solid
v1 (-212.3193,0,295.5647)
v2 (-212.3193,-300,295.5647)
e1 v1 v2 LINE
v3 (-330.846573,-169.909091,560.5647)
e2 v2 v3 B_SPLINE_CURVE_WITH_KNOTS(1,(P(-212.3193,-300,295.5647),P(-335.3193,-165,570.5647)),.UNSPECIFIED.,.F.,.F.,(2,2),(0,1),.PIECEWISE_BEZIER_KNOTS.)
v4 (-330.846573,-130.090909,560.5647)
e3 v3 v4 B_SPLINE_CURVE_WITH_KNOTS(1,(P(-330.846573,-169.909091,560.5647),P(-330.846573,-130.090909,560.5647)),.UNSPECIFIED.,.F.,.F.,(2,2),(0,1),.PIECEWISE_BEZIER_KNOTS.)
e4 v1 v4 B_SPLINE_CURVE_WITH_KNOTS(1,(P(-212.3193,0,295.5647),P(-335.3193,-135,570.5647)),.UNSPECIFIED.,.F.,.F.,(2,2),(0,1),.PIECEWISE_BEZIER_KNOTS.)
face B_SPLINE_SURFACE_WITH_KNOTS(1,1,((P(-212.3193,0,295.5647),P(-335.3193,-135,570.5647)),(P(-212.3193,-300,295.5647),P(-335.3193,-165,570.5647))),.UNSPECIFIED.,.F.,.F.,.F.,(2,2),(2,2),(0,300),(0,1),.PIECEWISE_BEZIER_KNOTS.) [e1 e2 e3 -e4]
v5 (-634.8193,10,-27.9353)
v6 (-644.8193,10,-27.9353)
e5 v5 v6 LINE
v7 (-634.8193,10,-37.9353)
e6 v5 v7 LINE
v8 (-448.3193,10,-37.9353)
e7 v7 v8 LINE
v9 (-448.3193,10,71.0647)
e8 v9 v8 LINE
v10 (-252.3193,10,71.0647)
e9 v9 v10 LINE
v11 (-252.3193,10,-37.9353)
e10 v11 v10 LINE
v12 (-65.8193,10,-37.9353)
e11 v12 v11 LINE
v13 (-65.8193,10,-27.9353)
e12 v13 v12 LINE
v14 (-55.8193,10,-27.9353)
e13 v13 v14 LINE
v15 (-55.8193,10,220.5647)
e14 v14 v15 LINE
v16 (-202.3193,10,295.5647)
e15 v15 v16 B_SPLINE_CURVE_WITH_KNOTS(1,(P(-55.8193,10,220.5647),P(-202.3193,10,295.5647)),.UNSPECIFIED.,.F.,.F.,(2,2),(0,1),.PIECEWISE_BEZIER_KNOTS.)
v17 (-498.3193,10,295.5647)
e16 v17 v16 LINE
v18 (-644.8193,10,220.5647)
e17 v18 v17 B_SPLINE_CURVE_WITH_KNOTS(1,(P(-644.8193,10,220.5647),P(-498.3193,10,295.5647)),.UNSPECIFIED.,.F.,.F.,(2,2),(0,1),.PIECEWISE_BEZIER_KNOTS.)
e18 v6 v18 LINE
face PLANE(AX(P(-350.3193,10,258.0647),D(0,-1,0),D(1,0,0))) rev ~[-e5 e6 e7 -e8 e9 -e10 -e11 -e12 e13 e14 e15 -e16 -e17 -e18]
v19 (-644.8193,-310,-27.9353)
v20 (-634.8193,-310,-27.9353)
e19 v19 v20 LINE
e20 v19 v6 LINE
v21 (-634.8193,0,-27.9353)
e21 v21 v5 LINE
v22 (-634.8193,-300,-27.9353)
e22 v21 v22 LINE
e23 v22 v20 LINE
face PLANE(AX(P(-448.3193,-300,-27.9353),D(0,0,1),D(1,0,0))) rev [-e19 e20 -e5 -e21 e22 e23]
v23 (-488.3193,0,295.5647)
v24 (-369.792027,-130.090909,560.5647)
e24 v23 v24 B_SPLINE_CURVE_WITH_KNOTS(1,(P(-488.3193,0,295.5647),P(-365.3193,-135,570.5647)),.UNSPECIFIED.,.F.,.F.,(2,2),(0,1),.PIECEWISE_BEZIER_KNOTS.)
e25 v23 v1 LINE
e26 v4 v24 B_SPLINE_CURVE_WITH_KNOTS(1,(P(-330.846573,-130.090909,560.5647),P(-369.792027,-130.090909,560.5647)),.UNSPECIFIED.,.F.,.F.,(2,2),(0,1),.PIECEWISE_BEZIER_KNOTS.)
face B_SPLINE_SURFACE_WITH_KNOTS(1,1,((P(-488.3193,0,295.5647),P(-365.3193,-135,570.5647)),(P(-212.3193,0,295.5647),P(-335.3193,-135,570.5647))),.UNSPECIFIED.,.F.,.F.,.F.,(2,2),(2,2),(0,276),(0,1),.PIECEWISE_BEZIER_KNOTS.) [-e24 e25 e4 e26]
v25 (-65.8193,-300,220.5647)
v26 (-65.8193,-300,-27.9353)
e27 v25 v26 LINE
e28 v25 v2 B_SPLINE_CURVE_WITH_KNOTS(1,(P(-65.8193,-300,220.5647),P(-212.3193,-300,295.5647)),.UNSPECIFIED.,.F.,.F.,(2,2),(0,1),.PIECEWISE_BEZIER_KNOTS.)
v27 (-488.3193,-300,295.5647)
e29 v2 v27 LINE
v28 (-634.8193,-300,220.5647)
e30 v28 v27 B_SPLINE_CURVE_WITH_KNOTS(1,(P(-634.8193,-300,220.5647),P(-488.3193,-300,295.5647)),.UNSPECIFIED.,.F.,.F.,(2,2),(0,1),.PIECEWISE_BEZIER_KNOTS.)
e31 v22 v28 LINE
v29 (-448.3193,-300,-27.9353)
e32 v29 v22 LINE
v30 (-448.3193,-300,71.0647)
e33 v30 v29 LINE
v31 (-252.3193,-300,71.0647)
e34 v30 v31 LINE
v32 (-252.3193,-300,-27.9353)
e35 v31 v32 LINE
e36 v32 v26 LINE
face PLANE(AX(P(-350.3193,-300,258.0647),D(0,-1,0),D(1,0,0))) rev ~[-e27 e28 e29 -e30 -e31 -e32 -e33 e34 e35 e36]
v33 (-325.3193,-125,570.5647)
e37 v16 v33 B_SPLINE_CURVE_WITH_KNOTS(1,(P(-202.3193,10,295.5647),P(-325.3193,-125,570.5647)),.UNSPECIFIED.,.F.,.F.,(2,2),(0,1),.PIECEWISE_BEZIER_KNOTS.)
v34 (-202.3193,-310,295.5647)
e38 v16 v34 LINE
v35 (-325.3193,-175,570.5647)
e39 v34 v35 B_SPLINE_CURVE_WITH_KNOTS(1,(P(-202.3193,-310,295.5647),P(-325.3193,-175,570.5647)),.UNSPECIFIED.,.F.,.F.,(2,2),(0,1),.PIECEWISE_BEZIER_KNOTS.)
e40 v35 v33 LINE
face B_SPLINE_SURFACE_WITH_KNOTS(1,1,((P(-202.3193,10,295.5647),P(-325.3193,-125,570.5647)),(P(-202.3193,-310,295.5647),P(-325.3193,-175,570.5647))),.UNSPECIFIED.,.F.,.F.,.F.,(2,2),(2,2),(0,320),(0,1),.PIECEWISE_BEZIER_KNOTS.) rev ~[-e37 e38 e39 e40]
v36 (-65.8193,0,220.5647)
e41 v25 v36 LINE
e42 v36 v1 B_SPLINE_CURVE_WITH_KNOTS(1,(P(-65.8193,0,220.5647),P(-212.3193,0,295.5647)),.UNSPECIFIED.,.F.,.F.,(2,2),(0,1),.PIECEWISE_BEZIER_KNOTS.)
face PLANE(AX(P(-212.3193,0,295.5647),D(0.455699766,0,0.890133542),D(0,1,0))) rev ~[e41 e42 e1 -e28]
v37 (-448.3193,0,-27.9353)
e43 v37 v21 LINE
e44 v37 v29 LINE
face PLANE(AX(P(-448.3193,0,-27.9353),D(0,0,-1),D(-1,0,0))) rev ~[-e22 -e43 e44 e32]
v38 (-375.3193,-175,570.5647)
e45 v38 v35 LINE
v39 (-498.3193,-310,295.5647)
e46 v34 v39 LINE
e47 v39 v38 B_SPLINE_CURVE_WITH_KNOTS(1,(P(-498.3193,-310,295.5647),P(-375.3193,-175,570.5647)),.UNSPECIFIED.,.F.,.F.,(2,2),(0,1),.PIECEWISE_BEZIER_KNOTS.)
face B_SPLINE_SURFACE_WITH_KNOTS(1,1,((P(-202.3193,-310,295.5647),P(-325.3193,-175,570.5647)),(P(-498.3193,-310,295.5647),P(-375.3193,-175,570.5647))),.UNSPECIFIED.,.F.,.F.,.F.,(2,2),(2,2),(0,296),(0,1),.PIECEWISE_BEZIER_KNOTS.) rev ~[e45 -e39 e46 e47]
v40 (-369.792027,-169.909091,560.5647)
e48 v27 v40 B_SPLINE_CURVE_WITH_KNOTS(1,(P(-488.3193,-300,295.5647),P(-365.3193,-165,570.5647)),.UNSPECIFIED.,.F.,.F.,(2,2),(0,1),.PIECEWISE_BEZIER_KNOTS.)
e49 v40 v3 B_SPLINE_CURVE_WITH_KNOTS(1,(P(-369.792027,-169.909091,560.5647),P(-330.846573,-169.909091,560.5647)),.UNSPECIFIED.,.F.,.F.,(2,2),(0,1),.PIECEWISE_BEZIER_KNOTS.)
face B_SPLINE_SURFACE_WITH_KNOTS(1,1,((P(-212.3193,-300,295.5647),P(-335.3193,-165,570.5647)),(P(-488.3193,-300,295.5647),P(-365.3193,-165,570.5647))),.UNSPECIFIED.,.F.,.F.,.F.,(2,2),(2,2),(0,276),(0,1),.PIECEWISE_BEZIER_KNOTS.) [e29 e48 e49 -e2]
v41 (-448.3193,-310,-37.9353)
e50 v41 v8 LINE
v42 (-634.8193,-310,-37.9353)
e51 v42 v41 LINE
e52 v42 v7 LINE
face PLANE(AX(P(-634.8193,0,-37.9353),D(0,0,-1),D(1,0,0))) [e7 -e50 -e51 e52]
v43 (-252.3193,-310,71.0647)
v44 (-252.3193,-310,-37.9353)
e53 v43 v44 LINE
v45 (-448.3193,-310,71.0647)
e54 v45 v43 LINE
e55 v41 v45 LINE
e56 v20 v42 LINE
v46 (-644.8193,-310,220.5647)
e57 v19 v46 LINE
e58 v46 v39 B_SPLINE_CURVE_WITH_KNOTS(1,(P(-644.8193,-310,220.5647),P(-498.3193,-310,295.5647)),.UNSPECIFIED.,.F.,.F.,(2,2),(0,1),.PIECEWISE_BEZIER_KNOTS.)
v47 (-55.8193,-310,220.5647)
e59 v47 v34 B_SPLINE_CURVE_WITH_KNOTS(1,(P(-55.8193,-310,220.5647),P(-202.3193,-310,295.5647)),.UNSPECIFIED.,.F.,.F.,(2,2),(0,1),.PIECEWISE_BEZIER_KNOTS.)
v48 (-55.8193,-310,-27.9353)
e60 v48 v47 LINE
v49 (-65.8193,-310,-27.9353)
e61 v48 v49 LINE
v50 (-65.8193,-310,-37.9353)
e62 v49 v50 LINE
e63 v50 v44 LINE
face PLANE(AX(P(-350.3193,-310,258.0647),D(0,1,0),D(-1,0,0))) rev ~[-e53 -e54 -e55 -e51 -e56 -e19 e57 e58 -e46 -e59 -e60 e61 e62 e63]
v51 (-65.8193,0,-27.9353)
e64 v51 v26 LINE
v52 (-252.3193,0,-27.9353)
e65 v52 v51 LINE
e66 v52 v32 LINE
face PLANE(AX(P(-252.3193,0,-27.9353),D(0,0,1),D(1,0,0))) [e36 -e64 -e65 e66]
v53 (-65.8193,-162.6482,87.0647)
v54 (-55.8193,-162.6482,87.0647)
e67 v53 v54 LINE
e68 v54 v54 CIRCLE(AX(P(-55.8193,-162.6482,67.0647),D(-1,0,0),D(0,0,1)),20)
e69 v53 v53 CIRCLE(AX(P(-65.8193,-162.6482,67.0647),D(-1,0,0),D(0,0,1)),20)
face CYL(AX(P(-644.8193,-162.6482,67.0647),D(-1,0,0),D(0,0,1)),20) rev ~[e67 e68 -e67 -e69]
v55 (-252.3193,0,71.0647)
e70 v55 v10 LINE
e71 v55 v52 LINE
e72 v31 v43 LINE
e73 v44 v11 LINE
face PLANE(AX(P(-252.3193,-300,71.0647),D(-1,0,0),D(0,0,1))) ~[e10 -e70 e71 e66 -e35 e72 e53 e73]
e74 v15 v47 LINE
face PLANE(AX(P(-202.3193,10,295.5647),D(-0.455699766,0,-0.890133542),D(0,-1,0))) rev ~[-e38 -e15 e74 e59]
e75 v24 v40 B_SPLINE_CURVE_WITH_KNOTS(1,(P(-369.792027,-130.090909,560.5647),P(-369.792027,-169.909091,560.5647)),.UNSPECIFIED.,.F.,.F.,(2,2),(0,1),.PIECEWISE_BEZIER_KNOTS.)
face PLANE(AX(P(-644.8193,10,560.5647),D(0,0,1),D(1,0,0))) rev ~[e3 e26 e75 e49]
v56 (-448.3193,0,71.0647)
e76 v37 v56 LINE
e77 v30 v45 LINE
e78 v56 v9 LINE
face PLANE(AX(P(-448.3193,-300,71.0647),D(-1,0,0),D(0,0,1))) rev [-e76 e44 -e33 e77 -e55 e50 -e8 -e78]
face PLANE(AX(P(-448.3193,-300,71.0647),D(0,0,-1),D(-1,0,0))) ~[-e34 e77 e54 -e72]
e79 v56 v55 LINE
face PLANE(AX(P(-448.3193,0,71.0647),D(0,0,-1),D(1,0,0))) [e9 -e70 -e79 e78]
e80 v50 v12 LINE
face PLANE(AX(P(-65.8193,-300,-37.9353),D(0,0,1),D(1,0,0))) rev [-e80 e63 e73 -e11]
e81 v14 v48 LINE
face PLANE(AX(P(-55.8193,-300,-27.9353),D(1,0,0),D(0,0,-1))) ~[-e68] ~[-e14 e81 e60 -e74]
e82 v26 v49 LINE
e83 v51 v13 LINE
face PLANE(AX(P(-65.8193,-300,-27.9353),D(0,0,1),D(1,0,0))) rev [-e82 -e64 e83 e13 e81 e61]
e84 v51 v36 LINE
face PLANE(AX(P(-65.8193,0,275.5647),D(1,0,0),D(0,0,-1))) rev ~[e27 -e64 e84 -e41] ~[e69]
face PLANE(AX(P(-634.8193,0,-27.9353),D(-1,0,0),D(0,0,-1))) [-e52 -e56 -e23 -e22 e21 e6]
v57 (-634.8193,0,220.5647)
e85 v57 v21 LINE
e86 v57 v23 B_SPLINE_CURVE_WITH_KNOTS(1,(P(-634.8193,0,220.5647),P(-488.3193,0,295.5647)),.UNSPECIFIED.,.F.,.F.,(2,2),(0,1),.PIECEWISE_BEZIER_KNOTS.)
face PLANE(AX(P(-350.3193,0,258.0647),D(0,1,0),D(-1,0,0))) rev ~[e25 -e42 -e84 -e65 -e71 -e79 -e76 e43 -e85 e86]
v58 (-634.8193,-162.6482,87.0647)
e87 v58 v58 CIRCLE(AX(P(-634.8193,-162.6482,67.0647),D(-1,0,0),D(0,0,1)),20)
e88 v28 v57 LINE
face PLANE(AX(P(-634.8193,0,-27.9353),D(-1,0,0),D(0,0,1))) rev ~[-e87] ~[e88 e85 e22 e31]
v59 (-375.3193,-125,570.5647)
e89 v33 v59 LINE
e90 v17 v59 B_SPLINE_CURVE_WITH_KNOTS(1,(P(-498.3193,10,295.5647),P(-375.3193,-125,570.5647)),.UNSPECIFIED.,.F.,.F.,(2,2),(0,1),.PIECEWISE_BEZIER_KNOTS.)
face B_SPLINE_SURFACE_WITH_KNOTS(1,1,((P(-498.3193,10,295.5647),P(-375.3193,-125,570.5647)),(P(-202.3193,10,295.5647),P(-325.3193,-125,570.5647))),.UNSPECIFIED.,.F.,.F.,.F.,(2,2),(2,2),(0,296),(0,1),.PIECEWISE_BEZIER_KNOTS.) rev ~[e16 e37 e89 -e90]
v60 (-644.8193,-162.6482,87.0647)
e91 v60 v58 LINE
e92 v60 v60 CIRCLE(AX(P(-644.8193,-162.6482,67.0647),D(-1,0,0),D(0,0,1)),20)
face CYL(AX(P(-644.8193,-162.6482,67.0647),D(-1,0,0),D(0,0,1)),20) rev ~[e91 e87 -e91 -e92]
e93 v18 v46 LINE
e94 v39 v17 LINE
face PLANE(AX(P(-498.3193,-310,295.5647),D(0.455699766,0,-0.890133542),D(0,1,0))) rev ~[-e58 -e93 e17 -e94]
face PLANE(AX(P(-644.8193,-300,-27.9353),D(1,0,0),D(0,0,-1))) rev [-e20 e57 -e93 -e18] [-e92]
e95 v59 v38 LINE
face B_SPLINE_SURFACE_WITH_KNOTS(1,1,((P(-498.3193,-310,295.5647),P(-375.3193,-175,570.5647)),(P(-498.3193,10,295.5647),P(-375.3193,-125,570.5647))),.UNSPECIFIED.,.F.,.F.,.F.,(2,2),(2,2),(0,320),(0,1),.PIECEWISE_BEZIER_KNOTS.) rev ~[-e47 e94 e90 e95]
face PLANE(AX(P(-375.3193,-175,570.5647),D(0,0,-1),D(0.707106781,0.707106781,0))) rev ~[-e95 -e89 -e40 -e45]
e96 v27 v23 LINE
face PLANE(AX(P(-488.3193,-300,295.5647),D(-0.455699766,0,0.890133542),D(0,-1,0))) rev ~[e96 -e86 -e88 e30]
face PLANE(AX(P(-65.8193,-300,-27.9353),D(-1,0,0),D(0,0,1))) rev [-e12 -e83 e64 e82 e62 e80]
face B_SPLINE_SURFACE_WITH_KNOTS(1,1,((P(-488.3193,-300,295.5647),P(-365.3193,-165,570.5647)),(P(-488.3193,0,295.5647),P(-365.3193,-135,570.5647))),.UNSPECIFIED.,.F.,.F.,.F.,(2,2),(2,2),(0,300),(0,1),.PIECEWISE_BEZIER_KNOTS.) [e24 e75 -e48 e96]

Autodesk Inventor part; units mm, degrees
sketch "Sketch1" plane through (0, 0, 0) normal (0, 1, 0) x (-1, 0, 0)
  line L0 (65.8193, -27.9353) -> (65.8193, 275.5647)
  line L1 (65.8193, 275.5647) -> (634.8193, 275.5647)
  line L2 (634.8193, 275.5647) -> (634.8193, -27.9353)
  line L3 (448.3193, 71.0647) -> (252.3193, 71.0647)
  line L4 (448.3193, 71.0647) -> (448.3193, -27.9353)
  line L5 (252.3193, 71.0647) -> (252.3193, -27.9353)
  line L6 (65.8193, -27.9353) -> (252.3193, -27.9353)
  line L7 (448.3193, -27.9353) -> (634.8193, -27.9353)
  point P0 (0, 0)
  dimension "d0" = 569
  dimension "d1" = 303.5
  dimension "d2" = 196
  dimension "d3" = 186.5
  dimension "d4" = 99
extrude "Extrusion1" add sketch "Sketch1" along normal blind 10
sketch "Sketch2" plane through (0, 0, 0) normal (0, -1, 0) x (1, 0, 0)
  line L0 (-65.8193, 275.5647) -> (-65.8193, -27.9353) projected
  line L1 (-65.8193, 275.5647) -> (-65.8193, -27.9353)
  line L2 (-65.8193, -27.9353) -> (-55.8193, -27.9353)
  line L3 (-55.8193, -27.9353) -> (-55.8193, 275.5647)
  line L4 (-55.8193, 275.5647) -> (-65.8193, 275.5647)
  line L5 (-634.8193, 275.5647) -> (-65.8193, 275.5647) projected
  line L6 (-634.8193, -27.9353) -> (-634.8193, 275.5647) projected
  line L7 (-634.8193, 275.5647) -> (-634.8193, -27.9353)
  line L8 (-634.8193, -27.9353) -> (-644.8193, -27.9353)
  line L9 (-644.8193, -27.9353) -> (-644.8193, 275.5647)
  line L10 (-644.8193, 275.5647) -> (-634.8193, 275.5647)
  point P0 (0, 0)
  dimension "d7" = 10
  dimension "d8" = 10
extrude "Extrusion2" add sketch "Sketch2" along normal blind 300
extrude "Extrusion3" add sketch "Sketch2" against normal blind 10
sketch "Sketch3" plane through (0, 0, 0) normal (0, -1, 0) x (1, 0, 0)
  line L0 (-252.3193, -27.9353) -> (-65.8193, -27.9353) projected
  line L1 (-252.3193, -27.9353) -> (-65.8193, -27.9353)
  line L2 (-65.8193, -27.9353) -> (-65.8193, -37.9353)
  line L3 (-65.8193, -37.9353) -> (-252.3193, -37.9353)
  line L4 (-252.3193, -37.9353) -> (-252.3193, -27.9353)
  line L5 (-448.3193, 71.0647) -> (-448.3193, -27.9353) projected
  line L6 (-448.3193, -37.9353) -> (-448.3193, -27.9353)
  line L7 (-634.8193, -27.9353) -> (-634.8193, 275.5647) projected
  line L8 (-448.3193, -27.9353) -> (-634.8193, -27.9353)
  line L9 (-634.8193, -27.9353) -> (-634.8193, -37.9353)
  line L10 (-634.8193, -37.9353) -> (-448.3193, -37.9353)
  point P0 (0, 0)
  point P1 (-644.8193, -27.9353)
  point P2 (-541.5693, -37.9353)
  point P3 (-159.0693, -37.9353)
  point P4 (-448.3193, -32.9353)
  dimension "d13" = 10
extrude "Extrusion4" add sketch "Sketch3" against normal blind 10
extrude "Extrusion5" add sketch "Sketch3" along normal blind 300
ref_plane "Work Plane1" through (0, -150, 0) normal (0, -1, 0) x (1, 0, 0)
mirror "Mirror1" about plane through (0, -150, 0) normal (0, -1, 0) of "Extrusion1", "Extrusion4", "Extrusion3"
sketch "Sketch4" plane through (-644.8193, 10, -27.9353) normal (-1, 0, 0) x (0, 0, 1)
  circle A0 centre (95, -172.6482) radius 20
  line L0 (0, 0) -> (0, -320) projected
  point P0 (27.9353, -10)
  dimension "d20" = 40
  dimension "d21" = 95
extrude "Extrusion6" cut sketch "Sketch4" against normal through all
sketch "Sketch5" plane through (0, 10, 0) normal (0, 1, 0) x (1, 0, 0)
  line L0 (-65.8193, -275.5647) -> (-634.8193, -275.5647) projected
  line L1 (-644.8193, 27.9353) -> (-644.8193, -275.5647) projected
  line L2 (-644.8193, -220.5647) -> (-519.8193, -220.5647)
  line L3 (-644.8193, -275.5647) -> (-55.8193, -275.5647) projected
  line L4 (-55.8193, -275.5647) -> (-55.8193, 27.9353) projected
  line L5 (-55.8193, -220.5647) -> (-55.8193, -275.5647)
  line L6 (-464.8193, -275.5647) -> (-55.8193, -275.5647)
  line L7 (-464.8193, -275.5647) -> (-644.8193, -275.5647)
  line L8 (-644.8193, -275.5647) -> (-644.8193, -220.5647)
  line L9 (-55.8193, -220.5647) -> (-519.8193, -220.5647)
  point P0 (0, 0)
  point P1 (-118.3193, -220.5647)
  point P2 (-582.3193, -220.5647)
  dimension "d27" = 125
extrude "Extrusion7" cut sketch "Sketch5" against normal through all
ref_plane "Work Plane3" through (-644.8193, 10, 570.5647) normal (0, 0, 1) x (1, 0, 0)
ref_plane "Work Plane4" through (-644.8193, 10, 295.5647) normal (0, 0, 1) x (1, 0, 0)
sketch "Sketch9" plane through (-644.8193, 10, 295.5647) normal (0, 0, 1) x (1, 0, 0)
  line L0 (146.5, -320) -> (146.5, 0)
  line L1 (146.5, 0) -> (442.5, 0)
  line L2 (442.5, 0) -> (442.5, -320)
  line L3 (442.5, -320) -> (146.5, -320)
  line L4 (10, -310) -> (579, -310) construction
  line L5 (392.5, -10) -> (392.5, -310) construction
  line L6 (579, -10) -> (10, -10) construction
  line L7 (0, 0) -> (589, 0) construction
  line L8 (156.5, -10) -> (156.5, -310) construction
  line L9 (156.5, -310) -> (432.5, -310) construction
  line L10 (432.5, -310) -> (432.5, -10) construction
  line L11 (432.5, -10) -> (156.5, -10) construction
  point P0 (644.8193, -10)
  point P1 (146.5, -160)
  point P2 (392.5, -160)
  point P3 (294.5, -10)
  point P4 (294.5, 0)
  point P5 (294.5, 0)
  point P6 (294.5, -320)
  dimension "d50" = 296
  dimension "d51" = 10
sketch "Sketch10" plane through (-644.8193, 10, 570.5647) normal (0, 0, 1) x (1, 0, 0)
  line L0 (269.5, -185) -> (319.5, -185)
  line L1 (319.5, -185) -> (319.5, -135)
  line L2 (319.5, -135) -> (269.5, -135)
  line L3 (269.5, -135) -> (269.5, -185)
  line L4 (196.5, -10) -> (196.5, -310) projected
  line L5 (579, -10) -> (10, -10) projected
  line L6 (279.5, -175) -> (279.5, -145) construction
  line L7 (279.5, -145) -> (309.5, -145) construction
  line L8 (309.5, -145) -> (309.5, -175) construction
  line L9 (309.5, -175) -> (279.5, -175) construction
  point P0 (644.8193, -10)
  point P1 (269.5, -160)
  point P2 (196.5, -160)
  point P3 (294.5, -135)
  point P4 (294.5, -10)
  dimension "d52" = 50
  dimension "d53" = 50
  dimension "d54" = 10
loft "Loft3" add profiles "Sketch9" section 1 edges at (-350.3193, -310, 220.5647) (-55.8193, -150, 220.5647) (-350.3193, 10, 220.5647) (-644.8193, -150, 220.5647)
sketch "Sketch11" plane through (-644.8193, 10, 295.5647) normal (0, 0, 1) x (1, 0, 0)
  line L0 (146.5, -320) -> (442.5, -320) construction
  line L1 (442.5, -320) -> (442.5, 0) construction
  line L2 (442.5, 0) -> (146.5, 0) construction
  line L3 (146.5, 0) -> (146.5, -320) construction
  line L4 (432.5, -10) -> (432.5, -310)
  line L5 (432.5, -310) -> (156.5, -310)
  line L6 (156.5, -310) -> (156.5, -10)
  line L7 (156.5, -10) -> (432.5, -10)
  point P0 (644.8193, -10)
  dimension "d59" = 10
loft "Loft4" cut profiles "Sketch11" section 1 edges at (-350.3193, -300, 220.5647) (-634.8193, -150, 220.5647) (-350.3193, 0, 220.5647) (-65.8193, -150, 220.5647)
loft "Loft5" add profiles "Sketch10" section 1 edges at (-350.3193, -310, 295.5647) (-202.3193, -150, 295.5647) (-350.3193, 10, 295.5647) (-498.3193, -150, 295.5647)
sketch "Sketch12" plane through (-644.8193, 10, 570.5647) normal (0, 0, 1) x (1, 0, 0)
  line L0 (309.5, -175) -> (309.5, -145)
  line L1 (309.5, -145) -> (279.5, -145)
  line L2 (279.5, -145) -> (279.5, -175)
  line L3 (279.5, -175) -> (309.5, -175)
  line L4 (319.5, -185) -> (269.5, -185) projected
  line L5 (319.5, -135) -> (319.5, -185) projected
  point P0 (644.8193, -10)
  point P1 (294.5, -175)
  point P2 (294.5, -185)
  point P3 (309.5, -160)
  point P4 (319.5, -160)
  dimension "d69" = 30
  dimension "d70" = 30
loft "Loft6" cut profiles "Sketch12" section 1 edges at (-212.3193, -150, 295.5647) (-350.3193, -300, 295.5647) (-488.3193, -150, 295.5647) (-350.3193, 0, 295.5647)
extrude "Extrusion9" add sketch "Sketch10" against normal blind 10 draft 10
properties part number "armorMk1"
